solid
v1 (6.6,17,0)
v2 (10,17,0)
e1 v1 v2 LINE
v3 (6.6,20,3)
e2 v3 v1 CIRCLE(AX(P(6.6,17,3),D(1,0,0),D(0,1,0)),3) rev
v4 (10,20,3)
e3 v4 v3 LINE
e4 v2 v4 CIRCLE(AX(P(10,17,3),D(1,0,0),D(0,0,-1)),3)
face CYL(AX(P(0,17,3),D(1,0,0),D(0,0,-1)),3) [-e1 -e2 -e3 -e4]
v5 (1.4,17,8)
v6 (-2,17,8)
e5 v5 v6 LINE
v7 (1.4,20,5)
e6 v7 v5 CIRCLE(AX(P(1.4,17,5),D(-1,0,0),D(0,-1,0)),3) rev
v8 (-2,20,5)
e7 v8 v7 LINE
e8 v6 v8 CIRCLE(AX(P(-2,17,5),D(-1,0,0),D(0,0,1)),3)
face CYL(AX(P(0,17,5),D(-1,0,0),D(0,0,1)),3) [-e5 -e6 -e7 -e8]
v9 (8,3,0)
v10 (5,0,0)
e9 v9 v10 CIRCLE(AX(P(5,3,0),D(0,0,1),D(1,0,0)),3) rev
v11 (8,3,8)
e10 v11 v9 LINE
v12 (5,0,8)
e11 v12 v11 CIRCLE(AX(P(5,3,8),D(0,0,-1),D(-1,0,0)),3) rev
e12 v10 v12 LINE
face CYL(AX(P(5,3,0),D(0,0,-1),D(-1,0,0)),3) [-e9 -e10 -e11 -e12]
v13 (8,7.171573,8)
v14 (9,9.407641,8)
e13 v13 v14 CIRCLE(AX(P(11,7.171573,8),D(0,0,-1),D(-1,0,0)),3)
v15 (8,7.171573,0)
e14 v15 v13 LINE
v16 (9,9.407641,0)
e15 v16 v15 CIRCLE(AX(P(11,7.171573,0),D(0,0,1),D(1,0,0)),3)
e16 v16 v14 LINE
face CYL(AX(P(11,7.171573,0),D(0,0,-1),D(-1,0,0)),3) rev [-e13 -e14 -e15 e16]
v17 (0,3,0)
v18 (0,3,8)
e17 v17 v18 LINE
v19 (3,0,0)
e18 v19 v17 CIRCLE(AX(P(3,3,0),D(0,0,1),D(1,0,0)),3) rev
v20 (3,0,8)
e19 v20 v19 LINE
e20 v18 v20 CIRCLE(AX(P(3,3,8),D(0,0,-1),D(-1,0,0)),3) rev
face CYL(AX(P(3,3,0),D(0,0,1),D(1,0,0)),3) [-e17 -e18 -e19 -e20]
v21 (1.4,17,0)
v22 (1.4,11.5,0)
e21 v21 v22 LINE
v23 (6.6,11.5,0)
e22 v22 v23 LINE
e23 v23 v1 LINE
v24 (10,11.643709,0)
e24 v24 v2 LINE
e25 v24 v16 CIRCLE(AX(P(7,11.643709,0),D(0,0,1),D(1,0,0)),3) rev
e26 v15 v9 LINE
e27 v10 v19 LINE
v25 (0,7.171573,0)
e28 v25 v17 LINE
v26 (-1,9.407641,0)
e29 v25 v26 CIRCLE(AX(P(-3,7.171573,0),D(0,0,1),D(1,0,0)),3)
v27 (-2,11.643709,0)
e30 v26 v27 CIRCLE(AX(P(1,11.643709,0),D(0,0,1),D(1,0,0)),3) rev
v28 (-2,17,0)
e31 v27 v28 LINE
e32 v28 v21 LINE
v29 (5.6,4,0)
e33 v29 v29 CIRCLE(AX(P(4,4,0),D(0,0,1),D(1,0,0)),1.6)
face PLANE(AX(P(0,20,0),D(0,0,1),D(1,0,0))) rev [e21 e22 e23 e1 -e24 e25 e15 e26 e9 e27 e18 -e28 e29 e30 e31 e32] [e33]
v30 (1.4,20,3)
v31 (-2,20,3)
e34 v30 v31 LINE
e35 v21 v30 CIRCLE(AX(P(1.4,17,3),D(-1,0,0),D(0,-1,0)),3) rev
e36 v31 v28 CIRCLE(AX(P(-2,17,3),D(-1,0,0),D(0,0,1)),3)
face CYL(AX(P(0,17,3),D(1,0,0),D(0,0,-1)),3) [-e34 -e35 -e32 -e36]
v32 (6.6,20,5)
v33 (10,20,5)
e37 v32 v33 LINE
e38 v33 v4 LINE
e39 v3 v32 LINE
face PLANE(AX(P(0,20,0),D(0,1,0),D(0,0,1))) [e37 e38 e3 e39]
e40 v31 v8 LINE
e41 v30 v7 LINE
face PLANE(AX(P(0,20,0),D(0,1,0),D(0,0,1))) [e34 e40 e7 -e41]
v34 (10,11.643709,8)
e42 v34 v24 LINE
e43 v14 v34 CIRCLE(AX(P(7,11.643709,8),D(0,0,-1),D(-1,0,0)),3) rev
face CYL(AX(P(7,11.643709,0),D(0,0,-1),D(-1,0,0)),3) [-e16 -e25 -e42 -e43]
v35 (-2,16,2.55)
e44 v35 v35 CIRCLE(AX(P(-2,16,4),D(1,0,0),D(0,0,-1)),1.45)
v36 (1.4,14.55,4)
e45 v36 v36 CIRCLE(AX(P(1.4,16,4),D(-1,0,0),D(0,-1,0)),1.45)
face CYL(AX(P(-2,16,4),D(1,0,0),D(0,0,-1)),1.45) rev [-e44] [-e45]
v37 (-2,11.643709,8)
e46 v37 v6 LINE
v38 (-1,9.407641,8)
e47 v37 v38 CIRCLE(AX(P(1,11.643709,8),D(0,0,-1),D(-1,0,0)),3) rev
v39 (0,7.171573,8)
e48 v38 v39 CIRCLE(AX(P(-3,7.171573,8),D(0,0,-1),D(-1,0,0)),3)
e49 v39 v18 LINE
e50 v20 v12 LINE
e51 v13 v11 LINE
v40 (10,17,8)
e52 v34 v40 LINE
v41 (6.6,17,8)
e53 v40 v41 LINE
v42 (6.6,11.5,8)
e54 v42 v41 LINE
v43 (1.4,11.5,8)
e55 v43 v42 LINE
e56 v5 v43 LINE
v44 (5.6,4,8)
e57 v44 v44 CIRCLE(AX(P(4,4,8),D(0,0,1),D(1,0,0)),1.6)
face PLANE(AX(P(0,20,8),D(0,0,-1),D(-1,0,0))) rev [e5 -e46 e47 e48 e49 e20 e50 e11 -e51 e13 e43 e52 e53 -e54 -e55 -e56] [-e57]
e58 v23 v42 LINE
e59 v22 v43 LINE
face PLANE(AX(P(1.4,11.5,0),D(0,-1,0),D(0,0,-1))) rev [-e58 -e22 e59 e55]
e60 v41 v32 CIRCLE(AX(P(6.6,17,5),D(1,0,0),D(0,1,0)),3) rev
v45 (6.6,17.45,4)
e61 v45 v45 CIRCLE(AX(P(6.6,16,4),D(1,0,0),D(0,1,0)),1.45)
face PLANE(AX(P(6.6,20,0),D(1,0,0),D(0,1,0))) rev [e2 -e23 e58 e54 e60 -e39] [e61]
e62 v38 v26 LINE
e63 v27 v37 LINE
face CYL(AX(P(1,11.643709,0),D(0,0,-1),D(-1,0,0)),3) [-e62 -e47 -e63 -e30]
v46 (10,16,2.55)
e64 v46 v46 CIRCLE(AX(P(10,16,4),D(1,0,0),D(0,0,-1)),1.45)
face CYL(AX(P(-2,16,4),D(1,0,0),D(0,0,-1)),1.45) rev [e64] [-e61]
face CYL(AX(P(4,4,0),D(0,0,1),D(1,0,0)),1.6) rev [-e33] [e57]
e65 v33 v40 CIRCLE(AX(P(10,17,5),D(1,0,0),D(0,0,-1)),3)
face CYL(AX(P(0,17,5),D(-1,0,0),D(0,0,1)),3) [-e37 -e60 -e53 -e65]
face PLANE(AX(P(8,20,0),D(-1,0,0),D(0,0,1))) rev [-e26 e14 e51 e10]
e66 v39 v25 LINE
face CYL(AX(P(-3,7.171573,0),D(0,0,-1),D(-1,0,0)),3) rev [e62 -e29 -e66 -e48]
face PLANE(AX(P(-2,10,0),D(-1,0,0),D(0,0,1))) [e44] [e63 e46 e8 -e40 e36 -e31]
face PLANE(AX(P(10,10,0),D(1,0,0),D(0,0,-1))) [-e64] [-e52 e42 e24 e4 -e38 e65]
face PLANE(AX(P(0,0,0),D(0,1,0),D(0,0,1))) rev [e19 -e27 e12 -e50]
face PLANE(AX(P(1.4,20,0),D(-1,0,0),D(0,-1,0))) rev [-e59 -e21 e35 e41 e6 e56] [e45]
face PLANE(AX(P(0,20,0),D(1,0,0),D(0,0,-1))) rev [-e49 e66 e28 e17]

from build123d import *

# Parameters (mm, degrees)
SKETCH_1_W          = 8
SKETCH_1_H          = 8
EXTRUDE_1_DEPTH     = 20
SKETCH_2_R          = 1.6
CUT_EXTRUDE_1_DEPTH = 23.978250586
SKETCH_4_W          = 2
SKETCH_4_H          = 8
EXTRUDE_3_DEPTH     = 10
SKETCH_5_W          = 5.2
SKETCH_5_H          = 8.5
CUT_EXTRUDE_2_DEPTH = 24.748684174
FILLET_1_R          = 3
SKETCH_6_R          = 1.45
CUT_EXTRUDE_3_DEPTH = 25.657656012
FILLET_2_R          = 3


with BuildPart() as part:
    # 草图1 → 凸台-拉伸1 (new body)
    with BuildSketch(Plane(origin=(0, 0, 0), x_dir=(1, 0, 0), z_dir=(0, 1, 0))):
        with Locations((4, -4)):
            Rectangle(SKETCH_1_W, SKETCH_1_H)
    extrude(amount=EXTRUDE_1_DEPTH)

    # 草图2 → 切除-拉伸1 (cut, through all)
    with BuildSketch(Plane.XY.offset(8)):
        with Locations((4, 4)):
            Circle(SKETCH_2_R)
    extrude(amount=-CUT_EXTRUDE_1_DEPTH, mode=Mode.SUBTRACT)

    # 草图4 → 凸台-拉伸3 (add)
    with BuildSketch(Plane(origin=(0, 20, 0), x_dir=(1, 0, 0), z_dir=(0, 1, 0))):
        with Locations((-1, -4)):
            Rectangle(SKETCH_4_W, SKETCH_4_H)
        with Locations((9, -4)):
            Rectangle(SKETCH_4_W, SKETCH_4_H)
    extrude(amount=-EXTRUDE_3_DEPTH)

    # 草图5 → 切除-拉伸2 (cut, through all)
    with BuildSketch(Plane.XY.offset(8)):
        with Locations((4, 15.75)):
            Rectangle(SKETCH_5_W, SKETCH_5_H)
    extrude(amount=-CUT_EXTRUDE_2_DEPTH, mode=Mode.SUBTRACT)

    # 圆角1
    # the kernel refuses this fillet: 3 mm, written as the material it adds along each edge
    with BuildSketch(Plane(origin=(8, 10, 8), x_dir=(0, -1, 0), z_dir=(0, 0, -1))) as fillet_1_piece_1:
        with BuildLine():
            CenterArc((2.828427125, -3), FILLET_1_R, 90, 70.528779366)
            Line((0, -2), (-0.056568542, -1.98))
            ThreePointArc((-0.056568542, -1.98), (-0.06, -1), (-0.06, 0))
            Line((-0.06, 0), (0, 0.06))
            Line((0, 0.06), (2.828427125, 0.06))
            Line((2.828427125, 0.06), (2.828427125, 0))
        make_face()
    extrude(amount=8)
    with BuildSketch(Plane(origin=(0, 10, 8), x_dir=(-1, 0, 0), z_dir=(0, 0, -1))) as fillet_1_piece_2:
        with BuildLine():
            CenterArc((3, -2.828427125), FILLET_1_R, 109.471220634, 70.528779366)
            Line((0, -2.828427125), (-0.06, -2.828427125))
            Line((-0.06, -2.828427125), (-0.06, 0))
            Line((-0.06, 0), (0, 0.06))
            ThreePointArc((0, 0.06), (1, 0.06), (1.98, 0.056568542))
            Line((1.98, 0.056568542), (2, 0))
        make_face()
    extrude(amount=8)

    # 草图6 → 切除-拉伸3 (cut, through all)
    with BuildSketch(Plane(origin=(10, 0, 0), x_dir=(0, 0, -1), z_dir=(1, 0, 0))):
        with Locations((-4, 16)):
            Circle(SKETCH_6_R)
    extrude(amount=-CUT_EXTRUDE_3_DEPTH, mode=Mode.SUBTRACT)

    # 圆角2
    fillet_2_edges = [part.edges().sort_by_distance(p)[0] for p in [
        (8.3, 20, 0),
        (-2, 10, 4),
        (10, 10, 4),
        (-0.3, 20, 0),
        (8.3, 20, 8),
        (8, 0, 4),
        (0, 0, 4),
        (-0.3, 20, 8),
    ]]
    fillet(fillet_2_edges, radius=FILLET_2_R)


solid = part.part
